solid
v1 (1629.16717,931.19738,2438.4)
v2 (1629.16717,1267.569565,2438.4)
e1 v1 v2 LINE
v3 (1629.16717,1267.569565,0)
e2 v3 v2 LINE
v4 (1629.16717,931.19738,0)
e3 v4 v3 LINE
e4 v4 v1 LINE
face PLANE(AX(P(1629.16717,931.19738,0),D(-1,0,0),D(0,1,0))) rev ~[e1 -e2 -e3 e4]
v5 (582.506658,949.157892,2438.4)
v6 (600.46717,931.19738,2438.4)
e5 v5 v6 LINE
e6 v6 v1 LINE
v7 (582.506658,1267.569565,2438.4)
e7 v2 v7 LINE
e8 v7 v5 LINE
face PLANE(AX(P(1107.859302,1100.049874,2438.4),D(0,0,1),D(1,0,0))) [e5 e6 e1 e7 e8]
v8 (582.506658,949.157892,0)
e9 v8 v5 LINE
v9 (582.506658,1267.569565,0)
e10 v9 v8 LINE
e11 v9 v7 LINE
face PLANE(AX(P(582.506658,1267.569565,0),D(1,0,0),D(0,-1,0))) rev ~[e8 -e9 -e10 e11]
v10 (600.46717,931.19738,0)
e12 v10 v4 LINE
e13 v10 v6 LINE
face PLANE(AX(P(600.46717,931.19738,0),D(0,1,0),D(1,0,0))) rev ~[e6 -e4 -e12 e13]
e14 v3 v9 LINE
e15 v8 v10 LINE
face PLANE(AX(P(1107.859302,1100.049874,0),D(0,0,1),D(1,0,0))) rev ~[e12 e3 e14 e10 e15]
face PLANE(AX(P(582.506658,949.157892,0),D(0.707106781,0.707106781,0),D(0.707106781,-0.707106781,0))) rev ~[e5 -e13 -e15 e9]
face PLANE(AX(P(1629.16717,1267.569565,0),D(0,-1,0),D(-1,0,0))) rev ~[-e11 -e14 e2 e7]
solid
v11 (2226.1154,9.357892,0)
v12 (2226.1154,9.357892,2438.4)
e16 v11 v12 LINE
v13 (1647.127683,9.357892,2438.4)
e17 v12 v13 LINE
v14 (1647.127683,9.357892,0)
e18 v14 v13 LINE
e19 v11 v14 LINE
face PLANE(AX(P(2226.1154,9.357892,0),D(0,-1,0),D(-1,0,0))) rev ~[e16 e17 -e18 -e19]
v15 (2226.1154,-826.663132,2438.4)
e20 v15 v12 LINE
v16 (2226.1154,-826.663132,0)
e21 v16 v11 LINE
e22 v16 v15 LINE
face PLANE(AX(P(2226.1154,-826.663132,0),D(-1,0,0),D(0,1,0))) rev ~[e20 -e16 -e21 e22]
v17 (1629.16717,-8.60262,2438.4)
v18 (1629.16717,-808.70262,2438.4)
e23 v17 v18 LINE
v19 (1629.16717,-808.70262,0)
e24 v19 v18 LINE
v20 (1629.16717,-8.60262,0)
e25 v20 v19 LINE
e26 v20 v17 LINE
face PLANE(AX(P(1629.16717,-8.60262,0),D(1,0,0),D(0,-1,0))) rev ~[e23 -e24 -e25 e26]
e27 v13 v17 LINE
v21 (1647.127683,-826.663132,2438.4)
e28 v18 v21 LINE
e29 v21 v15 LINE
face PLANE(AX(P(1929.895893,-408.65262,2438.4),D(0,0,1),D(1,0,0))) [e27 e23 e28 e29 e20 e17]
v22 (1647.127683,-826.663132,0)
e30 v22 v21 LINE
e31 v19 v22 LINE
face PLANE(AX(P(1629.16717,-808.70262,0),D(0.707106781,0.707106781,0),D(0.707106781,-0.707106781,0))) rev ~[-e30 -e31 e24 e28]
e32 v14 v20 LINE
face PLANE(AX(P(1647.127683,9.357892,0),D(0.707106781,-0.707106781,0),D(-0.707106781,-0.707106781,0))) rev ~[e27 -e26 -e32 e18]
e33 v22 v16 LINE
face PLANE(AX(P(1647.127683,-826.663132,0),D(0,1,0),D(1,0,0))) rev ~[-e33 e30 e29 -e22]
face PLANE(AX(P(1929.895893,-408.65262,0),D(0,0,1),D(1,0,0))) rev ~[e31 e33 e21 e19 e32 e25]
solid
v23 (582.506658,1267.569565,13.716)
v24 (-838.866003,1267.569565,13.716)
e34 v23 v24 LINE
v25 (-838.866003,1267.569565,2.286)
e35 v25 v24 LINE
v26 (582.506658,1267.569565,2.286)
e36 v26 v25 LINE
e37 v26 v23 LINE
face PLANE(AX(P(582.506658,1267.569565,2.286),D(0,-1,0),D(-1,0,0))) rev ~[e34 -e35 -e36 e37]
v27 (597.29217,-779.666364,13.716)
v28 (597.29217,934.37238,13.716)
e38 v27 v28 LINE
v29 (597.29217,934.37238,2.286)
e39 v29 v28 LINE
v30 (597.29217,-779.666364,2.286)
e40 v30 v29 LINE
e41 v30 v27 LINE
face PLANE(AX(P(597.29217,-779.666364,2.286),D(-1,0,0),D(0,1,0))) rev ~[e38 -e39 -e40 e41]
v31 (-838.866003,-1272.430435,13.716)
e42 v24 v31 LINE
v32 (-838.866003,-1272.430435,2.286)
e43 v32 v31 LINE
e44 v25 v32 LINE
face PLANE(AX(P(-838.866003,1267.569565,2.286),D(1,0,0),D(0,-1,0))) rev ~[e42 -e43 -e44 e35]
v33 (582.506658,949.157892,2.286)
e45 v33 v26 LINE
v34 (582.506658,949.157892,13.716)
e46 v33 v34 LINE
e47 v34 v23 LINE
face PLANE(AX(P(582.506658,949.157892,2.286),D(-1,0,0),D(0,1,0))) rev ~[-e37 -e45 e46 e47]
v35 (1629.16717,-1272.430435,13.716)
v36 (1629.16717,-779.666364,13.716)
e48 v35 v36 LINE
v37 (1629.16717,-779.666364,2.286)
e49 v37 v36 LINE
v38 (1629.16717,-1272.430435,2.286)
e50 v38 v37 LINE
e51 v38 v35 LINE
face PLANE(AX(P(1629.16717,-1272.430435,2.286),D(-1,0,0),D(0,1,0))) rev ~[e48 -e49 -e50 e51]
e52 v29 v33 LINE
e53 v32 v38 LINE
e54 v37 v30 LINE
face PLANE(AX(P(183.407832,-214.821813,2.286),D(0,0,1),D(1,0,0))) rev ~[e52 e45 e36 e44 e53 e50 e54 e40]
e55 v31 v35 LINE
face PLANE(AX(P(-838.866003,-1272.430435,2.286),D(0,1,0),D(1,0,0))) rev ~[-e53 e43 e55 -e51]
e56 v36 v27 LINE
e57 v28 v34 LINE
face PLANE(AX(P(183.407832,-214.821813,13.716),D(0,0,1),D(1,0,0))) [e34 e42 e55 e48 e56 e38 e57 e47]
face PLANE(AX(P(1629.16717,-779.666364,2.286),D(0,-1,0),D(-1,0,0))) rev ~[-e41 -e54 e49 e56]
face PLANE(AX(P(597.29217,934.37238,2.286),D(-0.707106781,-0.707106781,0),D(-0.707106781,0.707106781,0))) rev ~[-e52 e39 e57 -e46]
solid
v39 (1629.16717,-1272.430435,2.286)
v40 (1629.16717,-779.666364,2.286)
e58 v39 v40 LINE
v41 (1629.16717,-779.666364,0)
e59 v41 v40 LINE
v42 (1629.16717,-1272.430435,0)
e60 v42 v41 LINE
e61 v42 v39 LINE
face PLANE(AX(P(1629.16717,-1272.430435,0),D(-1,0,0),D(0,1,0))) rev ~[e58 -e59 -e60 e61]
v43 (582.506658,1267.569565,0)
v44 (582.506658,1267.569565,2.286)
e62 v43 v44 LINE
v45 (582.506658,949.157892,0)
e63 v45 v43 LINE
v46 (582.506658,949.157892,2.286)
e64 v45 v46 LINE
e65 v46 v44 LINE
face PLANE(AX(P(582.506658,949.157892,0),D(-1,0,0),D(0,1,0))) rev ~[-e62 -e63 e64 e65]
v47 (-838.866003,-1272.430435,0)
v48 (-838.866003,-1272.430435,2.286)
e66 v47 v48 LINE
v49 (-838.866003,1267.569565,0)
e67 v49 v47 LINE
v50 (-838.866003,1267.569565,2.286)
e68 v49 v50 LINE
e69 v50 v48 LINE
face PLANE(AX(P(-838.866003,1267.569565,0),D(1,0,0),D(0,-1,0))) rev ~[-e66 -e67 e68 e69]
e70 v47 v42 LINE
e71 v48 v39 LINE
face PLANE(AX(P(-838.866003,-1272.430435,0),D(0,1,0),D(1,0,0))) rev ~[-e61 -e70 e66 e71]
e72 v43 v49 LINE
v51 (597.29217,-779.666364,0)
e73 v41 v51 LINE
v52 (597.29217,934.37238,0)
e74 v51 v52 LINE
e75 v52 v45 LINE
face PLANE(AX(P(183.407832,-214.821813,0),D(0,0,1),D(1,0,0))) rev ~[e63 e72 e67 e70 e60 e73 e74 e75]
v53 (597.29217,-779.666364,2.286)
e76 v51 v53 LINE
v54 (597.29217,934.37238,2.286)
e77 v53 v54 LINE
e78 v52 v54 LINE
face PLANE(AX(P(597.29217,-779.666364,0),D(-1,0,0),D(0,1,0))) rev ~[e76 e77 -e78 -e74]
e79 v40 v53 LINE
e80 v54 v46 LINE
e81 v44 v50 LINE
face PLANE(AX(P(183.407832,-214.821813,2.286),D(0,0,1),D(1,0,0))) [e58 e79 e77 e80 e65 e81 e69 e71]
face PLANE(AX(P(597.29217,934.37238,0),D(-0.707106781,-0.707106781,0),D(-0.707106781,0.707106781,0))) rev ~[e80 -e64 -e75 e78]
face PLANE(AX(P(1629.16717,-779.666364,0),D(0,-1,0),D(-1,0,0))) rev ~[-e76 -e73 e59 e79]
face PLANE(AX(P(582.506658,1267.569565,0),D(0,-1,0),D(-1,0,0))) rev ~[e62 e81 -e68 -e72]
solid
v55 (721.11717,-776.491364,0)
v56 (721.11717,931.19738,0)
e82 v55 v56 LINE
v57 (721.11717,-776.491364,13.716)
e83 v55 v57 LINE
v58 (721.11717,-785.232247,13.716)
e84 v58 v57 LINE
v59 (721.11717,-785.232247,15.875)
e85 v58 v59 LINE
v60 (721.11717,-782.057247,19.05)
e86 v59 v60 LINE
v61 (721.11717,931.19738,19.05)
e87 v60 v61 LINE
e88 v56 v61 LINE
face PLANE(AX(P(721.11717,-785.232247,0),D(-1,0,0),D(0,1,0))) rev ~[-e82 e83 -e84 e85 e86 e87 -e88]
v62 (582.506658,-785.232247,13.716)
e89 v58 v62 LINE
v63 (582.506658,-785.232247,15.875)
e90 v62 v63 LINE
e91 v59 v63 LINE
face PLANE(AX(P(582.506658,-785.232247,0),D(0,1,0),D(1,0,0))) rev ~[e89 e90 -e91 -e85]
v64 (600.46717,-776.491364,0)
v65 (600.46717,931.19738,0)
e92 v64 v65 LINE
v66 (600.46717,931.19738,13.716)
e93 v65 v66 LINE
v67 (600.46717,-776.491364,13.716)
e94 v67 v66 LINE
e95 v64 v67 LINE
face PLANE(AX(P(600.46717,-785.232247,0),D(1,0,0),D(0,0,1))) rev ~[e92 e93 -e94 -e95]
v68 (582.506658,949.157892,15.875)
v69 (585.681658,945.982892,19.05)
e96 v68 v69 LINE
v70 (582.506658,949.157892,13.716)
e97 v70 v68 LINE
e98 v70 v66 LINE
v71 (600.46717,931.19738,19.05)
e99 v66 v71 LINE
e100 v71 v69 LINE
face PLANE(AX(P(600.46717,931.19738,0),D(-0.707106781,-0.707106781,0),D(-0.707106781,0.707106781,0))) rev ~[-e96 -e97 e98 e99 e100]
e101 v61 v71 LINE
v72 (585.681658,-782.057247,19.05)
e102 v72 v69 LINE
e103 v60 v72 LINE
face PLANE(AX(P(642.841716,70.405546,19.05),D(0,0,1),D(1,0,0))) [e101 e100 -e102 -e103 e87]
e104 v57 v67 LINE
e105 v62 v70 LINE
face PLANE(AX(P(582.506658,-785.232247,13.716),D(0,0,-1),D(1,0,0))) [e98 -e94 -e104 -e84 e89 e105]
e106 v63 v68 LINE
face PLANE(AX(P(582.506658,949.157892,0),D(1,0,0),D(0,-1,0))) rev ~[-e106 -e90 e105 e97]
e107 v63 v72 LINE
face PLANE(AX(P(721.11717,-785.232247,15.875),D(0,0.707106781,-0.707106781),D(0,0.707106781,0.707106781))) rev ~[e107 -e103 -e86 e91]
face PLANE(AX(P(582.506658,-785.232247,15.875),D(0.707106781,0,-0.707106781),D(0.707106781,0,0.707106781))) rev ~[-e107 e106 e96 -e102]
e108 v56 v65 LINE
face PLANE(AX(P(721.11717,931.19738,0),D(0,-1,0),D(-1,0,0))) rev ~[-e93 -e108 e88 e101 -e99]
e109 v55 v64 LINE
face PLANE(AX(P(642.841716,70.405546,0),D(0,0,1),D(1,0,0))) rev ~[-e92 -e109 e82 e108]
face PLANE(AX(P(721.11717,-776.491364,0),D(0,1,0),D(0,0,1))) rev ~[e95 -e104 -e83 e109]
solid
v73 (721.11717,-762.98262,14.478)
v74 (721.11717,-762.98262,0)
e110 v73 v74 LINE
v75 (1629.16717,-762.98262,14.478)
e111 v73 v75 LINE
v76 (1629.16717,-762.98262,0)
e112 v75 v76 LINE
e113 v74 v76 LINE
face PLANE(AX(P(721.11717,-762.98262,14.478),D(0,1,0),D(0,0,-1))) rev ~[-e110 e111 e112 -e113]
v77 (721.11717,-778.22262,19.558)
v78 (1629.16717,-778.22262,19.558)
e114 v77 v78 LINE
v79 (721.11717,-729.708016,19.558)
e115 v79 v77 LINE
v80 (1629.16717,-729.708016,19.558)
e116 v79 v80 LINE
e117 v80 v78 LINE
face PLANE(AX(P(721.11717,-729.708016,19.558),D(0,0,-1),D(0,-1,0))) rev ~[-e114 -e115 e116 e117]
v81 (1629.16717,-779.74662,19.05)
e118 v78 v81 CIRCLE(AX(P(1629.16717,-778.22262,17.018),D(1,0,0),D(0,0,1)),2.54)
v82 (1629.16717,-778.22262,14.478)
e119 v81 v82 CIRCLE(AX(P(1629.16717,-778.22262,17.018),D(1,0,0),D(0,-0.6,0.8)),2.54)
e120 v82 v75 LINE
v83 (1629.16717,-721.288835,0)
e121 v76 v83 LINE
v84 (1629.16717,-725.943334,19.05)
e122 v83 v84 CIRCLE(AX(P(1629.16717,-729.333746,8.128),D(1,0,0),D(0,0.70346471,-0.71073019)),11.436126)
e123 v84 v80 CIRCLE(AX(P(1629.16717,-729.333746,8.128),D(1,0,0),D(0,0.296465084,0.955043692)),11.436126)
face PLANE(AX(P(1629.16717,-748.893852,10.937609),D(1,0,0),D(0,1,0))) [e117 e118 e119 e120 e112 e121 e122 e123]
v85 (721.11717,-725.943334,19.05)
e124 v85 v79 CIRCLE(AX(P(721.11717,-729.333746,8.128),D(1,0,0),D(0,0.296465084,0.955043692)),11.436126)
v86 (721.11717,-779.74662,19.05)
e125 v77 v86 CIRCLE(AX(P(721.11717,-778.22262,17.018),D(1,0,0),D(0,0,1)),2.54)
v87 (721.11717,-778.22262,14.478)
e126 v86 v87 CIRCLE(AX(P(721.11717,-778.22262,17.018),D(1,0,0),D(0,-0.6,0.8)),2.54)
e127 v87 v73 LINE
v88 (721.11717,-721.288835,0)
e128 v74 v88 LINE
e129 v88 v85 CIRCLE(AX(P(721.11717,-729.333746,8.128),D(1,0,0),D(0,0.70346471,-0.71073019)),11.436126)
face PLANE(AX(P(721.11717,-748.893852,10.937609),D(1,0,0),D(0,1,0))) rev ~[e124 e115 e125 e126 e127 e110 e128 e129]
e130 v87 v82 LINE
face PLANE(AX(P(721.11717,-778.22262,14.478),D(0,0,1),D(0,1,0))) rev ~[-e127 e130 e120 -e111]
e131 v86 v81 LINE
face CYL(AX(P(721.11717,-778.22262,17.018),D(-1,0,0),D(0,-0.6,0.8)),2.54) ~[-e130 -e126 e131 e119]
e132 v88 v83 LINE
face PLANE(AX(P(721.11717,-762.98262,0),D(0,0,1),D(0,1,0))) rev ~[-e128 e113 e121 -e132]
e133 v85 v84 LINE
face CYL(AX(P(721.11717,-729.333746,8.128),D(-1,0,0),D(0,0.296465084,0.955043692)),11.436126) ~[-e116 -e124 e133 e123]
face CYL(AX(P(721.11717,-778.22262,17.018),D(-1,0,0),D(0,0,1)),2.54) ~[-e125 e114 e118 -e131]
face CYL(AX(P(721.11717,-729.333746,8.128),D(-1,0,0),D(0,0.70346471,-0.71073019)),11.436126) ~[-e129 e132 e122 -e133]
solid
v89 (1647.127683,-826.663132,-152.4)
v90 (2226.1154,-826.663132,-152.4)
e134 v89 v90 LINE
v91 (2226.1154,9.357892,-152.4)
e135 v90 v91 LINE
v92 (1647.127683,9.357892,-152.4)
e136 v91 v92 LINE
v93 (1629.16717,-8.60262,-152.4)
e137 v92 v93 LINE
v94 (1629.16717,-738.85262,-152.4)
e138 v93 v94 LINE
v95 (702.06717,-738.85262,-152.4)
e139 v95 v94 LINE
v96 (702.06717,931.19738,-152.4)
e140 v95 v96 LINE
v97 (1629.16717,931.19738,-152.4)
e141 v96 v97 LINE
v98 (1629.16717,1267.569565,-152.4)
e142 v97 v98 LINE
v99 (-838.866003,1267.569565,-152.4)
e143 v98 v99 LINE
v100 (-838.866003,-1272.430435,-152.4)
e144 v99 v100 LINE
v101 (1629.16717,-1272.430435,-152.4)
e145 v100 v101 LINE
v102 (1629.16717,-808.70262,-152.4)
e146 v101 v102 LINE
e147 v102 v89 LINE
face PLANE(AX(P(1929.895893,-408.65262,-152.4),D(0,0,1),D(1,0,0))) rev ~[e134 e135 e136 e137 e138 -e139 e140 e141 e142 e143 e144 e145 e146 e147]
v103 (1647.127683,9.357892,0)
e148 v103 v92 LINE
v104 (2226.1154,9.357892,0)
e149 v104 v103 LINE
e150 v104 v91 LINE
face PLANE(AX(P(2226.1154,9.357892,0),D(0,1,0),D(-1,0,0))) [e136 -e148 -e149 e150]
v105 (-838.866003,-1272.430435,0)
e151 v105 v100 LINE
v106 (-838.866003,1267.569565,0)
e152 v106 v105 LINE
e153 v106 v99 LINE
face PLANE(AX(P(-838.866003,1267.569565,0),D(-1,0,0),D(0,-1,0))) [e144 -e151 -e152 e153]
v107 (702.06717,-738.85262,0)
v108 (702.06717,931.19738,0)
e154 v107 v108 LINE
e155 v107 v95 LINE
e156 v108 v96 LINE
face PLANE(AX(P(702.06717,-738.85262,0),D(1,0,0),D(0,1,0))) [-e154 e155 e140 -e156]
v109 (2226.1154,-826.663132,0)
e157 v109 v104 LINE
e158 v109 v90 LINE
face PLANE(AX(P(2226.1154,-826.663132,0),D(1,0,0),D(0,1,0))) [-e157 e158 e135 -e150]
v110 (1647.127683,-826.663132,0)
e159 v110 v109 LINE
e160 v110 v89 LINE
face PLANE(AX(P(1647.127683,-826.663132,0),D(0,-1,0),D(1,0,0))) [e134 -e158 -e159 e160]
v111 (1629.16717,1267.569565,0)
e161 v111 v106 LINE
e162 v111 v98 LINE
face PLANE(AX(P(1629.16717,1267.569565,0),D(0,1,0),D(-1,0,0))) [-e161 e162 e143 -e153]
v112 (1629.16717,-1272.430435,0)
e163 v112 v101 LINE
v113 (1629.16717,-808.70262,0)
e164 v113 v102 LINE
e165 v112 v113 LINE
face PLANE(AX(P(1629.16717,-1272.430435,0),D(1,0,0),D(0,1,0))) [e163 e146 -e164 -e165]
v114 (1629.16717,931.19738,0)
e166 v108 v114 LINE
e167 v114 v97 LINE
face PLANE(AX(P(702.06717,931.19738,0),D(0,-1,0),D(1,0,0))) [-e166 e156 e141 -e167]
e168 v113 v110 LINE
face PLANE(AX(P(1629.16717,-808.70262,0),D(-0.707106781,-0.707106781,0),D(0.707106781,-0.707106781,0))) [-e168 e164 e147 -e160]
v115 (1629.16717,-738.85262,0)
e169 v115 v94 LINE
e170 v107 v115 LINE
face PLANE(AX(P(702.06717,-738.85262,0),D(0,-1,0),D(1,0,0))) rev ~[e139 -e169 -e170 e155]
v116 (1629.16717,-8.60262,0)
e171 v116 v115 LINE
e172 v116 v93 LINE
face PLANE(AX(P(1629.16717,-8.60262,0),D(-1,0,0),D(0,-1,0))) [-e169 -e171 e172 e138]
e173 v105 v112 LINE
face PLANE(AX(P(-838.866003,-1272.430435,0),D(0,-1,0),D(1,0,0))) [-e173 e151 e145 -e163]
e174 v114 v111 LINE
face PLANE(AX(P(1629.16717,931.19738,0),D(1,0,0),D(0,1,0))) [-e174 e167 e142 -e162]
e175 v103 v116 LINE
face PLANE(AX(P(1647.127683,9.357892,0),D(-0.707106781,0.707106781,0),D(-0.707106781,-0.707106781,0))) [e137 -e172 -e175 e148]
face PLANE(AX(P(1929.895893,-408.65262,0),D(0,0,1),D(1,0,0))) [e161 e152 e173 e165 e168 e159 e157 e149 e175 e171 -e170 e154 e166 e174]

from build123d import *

# Parameters (mm, degrees)
F0_W      = 927.1
F0_H      = 336.3721848547
F0_H_2    = 533.5778151453
F1_DEPTH  = 152.4
F3_DEPTH  = 2438.4
F5_DEPTH  = 152.4
F6_DEPTH  = 2438.4
F7_W      = 19.05
F7_H      = 1670.05
F8_DEPTH  = 19.05
F10_DEPTH = 2.286
F11_DEPTH = 11.43
F13_DEPTH = 908.05
F15_DEPTH = 2052.8028121924
F16_W     = 17.9605122421
F16_H     = 13.716
F17_DEPTH = 2052.8028121924
F19_DEPTH = 1559.9841734515
F20_W     = 8.7408832695
F20_H     = 13.716
F21_DEPTH = 1559.9841734515


with BuildPart() as f1:
    # F0 (on Top) → F1 (new body)
    with BuildSketch(Plane.XY):
        Polygon((702.067170443, 931.1973798752), (702.067170443, 1267.5695647299), (-838.8660030085, 1267.5695647299), (-838.8660030085, -1272.4304352701), (702.067170443, -1272.4304352701), (702.067170443, -738.8526201248), align=None)
        with Locations((1165.617170443, 1099.3834723026)):
            Rectangle(F0_W, F0_H)
        with Locations((1165.617170443, -1005.6415276974)):
            Rectangle(F0_W, F0_H_2)
    extrude(amount=-F1_DEPTH)

    # F4 (on face) → F5 (join, through all)
    with BuildSketch(Plane.XY):
        Polygon((1629.167170443, -738.8526201248), (1629.167170443, -808.7026201248), (1647.1276826851, -826.663132367), (2226.1154003136, -826.663132367), (2226.1154003136, 9.3578921173), (1647.1276826851, 9.3578921173), (1629.167170443, -8.6026201248), align=None)
    extrude(amount=-F5_DEPTH)


with BuildPart() as f3:
    # F2 (on face) → F3 (new body)
    with BuildSketch(Plane.XY):
        Polygon((600.467170443, 931.1973798752), (702.067170443, 931.1973798752), (1629.167170443, 931.1973798752), (1629.167170443, 1267.5695647299), (582.5066582008, 1267.5695647299), (582.5066582008, 949.1578921173), align=None)
    extrude(amount=F3_DEPTH)


with BuildPart() as f6:
    # F4 (on face) → F6 (new body, through all)
    with BuildSketch(Plane.XY):
        Polygon((1629.167170443, -738.8526201248), (1629.167170443, -808.7026201248), (1647.1276826851, -826.663132367), (2226.1154003136, -826.663132367), (2226.1154003136, 9.3578921173), (1647.1276826851, 9.3578921173), (1629.167170443, -8.6026201248), align=None)
    extrude(amount=F6_DEPTH)


with BuildPart() as f8:
    # F7 (on face) → F8 (new body)
    with BuildSketch(Plane.XY):
        Polygon((702.067170443, 931.1973798752), (600.467170443, 931.1973798752), (582.5066582008, 949.1578921173), (582.5066582008, -785.2322474625), (721.117170443, -785.2322474625), (721.117170443, -738.8526201248), (702.067170443, -738.8526201248), align=None)
        with Locations((711.592170443, 96.1723798752)):
            Rectangle(F7_W, F7_H)
    extrude(amount=F8_DEPTH)

    # F14 (on face) → F15 (cut, through all)
    with BuildSketch(Plane.XZ.offset(785.2322474625)):
        Polygon((582.5066582008, 15.875), (585.6816582008, 19.05), (582.5066582008, 19.05), align=None)
    extrude(amount=-F15_DEPTH, mode=Mode.SUBTRACT)

    # F16 (on face) → F17 (cut, through all)
    with BuildSketch(Plane.XZ.offset(785.2322474625)):
        with Locations((591.4869143219, 6.858)):
            Rectangle(F16_W, F16_H)
    extrude(amount=-F17_DEPTH, mode=Mode.SUBTRACT)

    # F18 (on face) → F19 (cut, through all)
    with BuildSketch(Plane.YZ.offset(721.117170443)):
        Polygon((-782.0572474625, 19.05), (-785.2322474625, 19.05), (-785.2322474625, 15.875), align=None)
    extrude(amount=-F19_DEPTH, mode=Mode.SUBTRACT)

    # F20 (on face) → F21 (cut, through all)
    with BuildSketch(Plane.YZ.offset(721.117170443)):
        with Locations((-780.8618058277, 6.858)):
            Rectangle(F20_W, F20_H)
    extrude(amount=-F21_DEPTH, mode=Mode.SUBTRACT)


with BuildPart() as f10:
    # F9 (on face) → F10 (new body)
    with BuildSketch(Plane.XY):
        Polygon((582.5066582008, 949.1578921173), (582.5066582008, 1267.5695647299), (-838.8660030085, 1267.5695647299), (-838.8660030085, -1272.4304352701), (1629.167170443, -1272.4304352701), (1629.167170443, -808.7026201248), (1629.167170443, -779.666364193), (597.292170443, -779.666364193), (597.292170443, 934.3723798752), align=None)
    extrude(amount=F10_DEPTH)


with BuildPart() as f11:
    # F11 (new): a face of the model
    f11_faces = [f10.part.faces().sort_by_distance(p)[0] for p in [
        (29.5294646576, -129.086705172, 2.286),
    ]]
    extrude(f11_faces, amount=F11_DEPTH)


with BuildPart() as f13:
    # F12 (on face) → F13 (new body, through all)
    with BuildSketch(Plane.YZ.offset(721.117170443)):
        with BuildLine():
            Line((-762.9826201248, 0), (-738.8526201248, 0))
            Line((-738.8526201248, 0), (-721.2888350697, 0))
            ThreePointArc((-721.2888350697, 0), (-718.2244131725, 10.8423506116), (-725.9433340729, 19.05))
            Line((-725.9433340729, 19.05), (-779.7466201248, 19.05))
            ThreePointArc((-779.7466201248, 19.05), (-780.6322757019, 16.2147814743), (-778.2226201248, 14.478))
            Line((-778.2226201248, 14.478), (-762.9826201248, 14.478))
            Line((-762.9826201248, 14.478), (-762.9826201248, 0))
        make_face()
        with BuildLine():
            Line((-779.7466201248, 19.05), (-725.9433340729, 19.05))
            ThreePointArc((-725.9433340729, 19.05), (-727.8044343417, 19.4614100495), (-729.7080159187, 19.558))
            Line((-729.7080159187, 19.558), (-778.2226201248, 19.558))
            ThreePointArc((-778.2226201248, 19.558), (-779.0258386505, 19.427655577), (-779.7466201248, 19.05))
        make_face()
    extrude(amount=F13_DEPTH)


solid = Compound([f1.part, f3.part, f6.part, f8.part, f10.part, f11.part, f13.part])
